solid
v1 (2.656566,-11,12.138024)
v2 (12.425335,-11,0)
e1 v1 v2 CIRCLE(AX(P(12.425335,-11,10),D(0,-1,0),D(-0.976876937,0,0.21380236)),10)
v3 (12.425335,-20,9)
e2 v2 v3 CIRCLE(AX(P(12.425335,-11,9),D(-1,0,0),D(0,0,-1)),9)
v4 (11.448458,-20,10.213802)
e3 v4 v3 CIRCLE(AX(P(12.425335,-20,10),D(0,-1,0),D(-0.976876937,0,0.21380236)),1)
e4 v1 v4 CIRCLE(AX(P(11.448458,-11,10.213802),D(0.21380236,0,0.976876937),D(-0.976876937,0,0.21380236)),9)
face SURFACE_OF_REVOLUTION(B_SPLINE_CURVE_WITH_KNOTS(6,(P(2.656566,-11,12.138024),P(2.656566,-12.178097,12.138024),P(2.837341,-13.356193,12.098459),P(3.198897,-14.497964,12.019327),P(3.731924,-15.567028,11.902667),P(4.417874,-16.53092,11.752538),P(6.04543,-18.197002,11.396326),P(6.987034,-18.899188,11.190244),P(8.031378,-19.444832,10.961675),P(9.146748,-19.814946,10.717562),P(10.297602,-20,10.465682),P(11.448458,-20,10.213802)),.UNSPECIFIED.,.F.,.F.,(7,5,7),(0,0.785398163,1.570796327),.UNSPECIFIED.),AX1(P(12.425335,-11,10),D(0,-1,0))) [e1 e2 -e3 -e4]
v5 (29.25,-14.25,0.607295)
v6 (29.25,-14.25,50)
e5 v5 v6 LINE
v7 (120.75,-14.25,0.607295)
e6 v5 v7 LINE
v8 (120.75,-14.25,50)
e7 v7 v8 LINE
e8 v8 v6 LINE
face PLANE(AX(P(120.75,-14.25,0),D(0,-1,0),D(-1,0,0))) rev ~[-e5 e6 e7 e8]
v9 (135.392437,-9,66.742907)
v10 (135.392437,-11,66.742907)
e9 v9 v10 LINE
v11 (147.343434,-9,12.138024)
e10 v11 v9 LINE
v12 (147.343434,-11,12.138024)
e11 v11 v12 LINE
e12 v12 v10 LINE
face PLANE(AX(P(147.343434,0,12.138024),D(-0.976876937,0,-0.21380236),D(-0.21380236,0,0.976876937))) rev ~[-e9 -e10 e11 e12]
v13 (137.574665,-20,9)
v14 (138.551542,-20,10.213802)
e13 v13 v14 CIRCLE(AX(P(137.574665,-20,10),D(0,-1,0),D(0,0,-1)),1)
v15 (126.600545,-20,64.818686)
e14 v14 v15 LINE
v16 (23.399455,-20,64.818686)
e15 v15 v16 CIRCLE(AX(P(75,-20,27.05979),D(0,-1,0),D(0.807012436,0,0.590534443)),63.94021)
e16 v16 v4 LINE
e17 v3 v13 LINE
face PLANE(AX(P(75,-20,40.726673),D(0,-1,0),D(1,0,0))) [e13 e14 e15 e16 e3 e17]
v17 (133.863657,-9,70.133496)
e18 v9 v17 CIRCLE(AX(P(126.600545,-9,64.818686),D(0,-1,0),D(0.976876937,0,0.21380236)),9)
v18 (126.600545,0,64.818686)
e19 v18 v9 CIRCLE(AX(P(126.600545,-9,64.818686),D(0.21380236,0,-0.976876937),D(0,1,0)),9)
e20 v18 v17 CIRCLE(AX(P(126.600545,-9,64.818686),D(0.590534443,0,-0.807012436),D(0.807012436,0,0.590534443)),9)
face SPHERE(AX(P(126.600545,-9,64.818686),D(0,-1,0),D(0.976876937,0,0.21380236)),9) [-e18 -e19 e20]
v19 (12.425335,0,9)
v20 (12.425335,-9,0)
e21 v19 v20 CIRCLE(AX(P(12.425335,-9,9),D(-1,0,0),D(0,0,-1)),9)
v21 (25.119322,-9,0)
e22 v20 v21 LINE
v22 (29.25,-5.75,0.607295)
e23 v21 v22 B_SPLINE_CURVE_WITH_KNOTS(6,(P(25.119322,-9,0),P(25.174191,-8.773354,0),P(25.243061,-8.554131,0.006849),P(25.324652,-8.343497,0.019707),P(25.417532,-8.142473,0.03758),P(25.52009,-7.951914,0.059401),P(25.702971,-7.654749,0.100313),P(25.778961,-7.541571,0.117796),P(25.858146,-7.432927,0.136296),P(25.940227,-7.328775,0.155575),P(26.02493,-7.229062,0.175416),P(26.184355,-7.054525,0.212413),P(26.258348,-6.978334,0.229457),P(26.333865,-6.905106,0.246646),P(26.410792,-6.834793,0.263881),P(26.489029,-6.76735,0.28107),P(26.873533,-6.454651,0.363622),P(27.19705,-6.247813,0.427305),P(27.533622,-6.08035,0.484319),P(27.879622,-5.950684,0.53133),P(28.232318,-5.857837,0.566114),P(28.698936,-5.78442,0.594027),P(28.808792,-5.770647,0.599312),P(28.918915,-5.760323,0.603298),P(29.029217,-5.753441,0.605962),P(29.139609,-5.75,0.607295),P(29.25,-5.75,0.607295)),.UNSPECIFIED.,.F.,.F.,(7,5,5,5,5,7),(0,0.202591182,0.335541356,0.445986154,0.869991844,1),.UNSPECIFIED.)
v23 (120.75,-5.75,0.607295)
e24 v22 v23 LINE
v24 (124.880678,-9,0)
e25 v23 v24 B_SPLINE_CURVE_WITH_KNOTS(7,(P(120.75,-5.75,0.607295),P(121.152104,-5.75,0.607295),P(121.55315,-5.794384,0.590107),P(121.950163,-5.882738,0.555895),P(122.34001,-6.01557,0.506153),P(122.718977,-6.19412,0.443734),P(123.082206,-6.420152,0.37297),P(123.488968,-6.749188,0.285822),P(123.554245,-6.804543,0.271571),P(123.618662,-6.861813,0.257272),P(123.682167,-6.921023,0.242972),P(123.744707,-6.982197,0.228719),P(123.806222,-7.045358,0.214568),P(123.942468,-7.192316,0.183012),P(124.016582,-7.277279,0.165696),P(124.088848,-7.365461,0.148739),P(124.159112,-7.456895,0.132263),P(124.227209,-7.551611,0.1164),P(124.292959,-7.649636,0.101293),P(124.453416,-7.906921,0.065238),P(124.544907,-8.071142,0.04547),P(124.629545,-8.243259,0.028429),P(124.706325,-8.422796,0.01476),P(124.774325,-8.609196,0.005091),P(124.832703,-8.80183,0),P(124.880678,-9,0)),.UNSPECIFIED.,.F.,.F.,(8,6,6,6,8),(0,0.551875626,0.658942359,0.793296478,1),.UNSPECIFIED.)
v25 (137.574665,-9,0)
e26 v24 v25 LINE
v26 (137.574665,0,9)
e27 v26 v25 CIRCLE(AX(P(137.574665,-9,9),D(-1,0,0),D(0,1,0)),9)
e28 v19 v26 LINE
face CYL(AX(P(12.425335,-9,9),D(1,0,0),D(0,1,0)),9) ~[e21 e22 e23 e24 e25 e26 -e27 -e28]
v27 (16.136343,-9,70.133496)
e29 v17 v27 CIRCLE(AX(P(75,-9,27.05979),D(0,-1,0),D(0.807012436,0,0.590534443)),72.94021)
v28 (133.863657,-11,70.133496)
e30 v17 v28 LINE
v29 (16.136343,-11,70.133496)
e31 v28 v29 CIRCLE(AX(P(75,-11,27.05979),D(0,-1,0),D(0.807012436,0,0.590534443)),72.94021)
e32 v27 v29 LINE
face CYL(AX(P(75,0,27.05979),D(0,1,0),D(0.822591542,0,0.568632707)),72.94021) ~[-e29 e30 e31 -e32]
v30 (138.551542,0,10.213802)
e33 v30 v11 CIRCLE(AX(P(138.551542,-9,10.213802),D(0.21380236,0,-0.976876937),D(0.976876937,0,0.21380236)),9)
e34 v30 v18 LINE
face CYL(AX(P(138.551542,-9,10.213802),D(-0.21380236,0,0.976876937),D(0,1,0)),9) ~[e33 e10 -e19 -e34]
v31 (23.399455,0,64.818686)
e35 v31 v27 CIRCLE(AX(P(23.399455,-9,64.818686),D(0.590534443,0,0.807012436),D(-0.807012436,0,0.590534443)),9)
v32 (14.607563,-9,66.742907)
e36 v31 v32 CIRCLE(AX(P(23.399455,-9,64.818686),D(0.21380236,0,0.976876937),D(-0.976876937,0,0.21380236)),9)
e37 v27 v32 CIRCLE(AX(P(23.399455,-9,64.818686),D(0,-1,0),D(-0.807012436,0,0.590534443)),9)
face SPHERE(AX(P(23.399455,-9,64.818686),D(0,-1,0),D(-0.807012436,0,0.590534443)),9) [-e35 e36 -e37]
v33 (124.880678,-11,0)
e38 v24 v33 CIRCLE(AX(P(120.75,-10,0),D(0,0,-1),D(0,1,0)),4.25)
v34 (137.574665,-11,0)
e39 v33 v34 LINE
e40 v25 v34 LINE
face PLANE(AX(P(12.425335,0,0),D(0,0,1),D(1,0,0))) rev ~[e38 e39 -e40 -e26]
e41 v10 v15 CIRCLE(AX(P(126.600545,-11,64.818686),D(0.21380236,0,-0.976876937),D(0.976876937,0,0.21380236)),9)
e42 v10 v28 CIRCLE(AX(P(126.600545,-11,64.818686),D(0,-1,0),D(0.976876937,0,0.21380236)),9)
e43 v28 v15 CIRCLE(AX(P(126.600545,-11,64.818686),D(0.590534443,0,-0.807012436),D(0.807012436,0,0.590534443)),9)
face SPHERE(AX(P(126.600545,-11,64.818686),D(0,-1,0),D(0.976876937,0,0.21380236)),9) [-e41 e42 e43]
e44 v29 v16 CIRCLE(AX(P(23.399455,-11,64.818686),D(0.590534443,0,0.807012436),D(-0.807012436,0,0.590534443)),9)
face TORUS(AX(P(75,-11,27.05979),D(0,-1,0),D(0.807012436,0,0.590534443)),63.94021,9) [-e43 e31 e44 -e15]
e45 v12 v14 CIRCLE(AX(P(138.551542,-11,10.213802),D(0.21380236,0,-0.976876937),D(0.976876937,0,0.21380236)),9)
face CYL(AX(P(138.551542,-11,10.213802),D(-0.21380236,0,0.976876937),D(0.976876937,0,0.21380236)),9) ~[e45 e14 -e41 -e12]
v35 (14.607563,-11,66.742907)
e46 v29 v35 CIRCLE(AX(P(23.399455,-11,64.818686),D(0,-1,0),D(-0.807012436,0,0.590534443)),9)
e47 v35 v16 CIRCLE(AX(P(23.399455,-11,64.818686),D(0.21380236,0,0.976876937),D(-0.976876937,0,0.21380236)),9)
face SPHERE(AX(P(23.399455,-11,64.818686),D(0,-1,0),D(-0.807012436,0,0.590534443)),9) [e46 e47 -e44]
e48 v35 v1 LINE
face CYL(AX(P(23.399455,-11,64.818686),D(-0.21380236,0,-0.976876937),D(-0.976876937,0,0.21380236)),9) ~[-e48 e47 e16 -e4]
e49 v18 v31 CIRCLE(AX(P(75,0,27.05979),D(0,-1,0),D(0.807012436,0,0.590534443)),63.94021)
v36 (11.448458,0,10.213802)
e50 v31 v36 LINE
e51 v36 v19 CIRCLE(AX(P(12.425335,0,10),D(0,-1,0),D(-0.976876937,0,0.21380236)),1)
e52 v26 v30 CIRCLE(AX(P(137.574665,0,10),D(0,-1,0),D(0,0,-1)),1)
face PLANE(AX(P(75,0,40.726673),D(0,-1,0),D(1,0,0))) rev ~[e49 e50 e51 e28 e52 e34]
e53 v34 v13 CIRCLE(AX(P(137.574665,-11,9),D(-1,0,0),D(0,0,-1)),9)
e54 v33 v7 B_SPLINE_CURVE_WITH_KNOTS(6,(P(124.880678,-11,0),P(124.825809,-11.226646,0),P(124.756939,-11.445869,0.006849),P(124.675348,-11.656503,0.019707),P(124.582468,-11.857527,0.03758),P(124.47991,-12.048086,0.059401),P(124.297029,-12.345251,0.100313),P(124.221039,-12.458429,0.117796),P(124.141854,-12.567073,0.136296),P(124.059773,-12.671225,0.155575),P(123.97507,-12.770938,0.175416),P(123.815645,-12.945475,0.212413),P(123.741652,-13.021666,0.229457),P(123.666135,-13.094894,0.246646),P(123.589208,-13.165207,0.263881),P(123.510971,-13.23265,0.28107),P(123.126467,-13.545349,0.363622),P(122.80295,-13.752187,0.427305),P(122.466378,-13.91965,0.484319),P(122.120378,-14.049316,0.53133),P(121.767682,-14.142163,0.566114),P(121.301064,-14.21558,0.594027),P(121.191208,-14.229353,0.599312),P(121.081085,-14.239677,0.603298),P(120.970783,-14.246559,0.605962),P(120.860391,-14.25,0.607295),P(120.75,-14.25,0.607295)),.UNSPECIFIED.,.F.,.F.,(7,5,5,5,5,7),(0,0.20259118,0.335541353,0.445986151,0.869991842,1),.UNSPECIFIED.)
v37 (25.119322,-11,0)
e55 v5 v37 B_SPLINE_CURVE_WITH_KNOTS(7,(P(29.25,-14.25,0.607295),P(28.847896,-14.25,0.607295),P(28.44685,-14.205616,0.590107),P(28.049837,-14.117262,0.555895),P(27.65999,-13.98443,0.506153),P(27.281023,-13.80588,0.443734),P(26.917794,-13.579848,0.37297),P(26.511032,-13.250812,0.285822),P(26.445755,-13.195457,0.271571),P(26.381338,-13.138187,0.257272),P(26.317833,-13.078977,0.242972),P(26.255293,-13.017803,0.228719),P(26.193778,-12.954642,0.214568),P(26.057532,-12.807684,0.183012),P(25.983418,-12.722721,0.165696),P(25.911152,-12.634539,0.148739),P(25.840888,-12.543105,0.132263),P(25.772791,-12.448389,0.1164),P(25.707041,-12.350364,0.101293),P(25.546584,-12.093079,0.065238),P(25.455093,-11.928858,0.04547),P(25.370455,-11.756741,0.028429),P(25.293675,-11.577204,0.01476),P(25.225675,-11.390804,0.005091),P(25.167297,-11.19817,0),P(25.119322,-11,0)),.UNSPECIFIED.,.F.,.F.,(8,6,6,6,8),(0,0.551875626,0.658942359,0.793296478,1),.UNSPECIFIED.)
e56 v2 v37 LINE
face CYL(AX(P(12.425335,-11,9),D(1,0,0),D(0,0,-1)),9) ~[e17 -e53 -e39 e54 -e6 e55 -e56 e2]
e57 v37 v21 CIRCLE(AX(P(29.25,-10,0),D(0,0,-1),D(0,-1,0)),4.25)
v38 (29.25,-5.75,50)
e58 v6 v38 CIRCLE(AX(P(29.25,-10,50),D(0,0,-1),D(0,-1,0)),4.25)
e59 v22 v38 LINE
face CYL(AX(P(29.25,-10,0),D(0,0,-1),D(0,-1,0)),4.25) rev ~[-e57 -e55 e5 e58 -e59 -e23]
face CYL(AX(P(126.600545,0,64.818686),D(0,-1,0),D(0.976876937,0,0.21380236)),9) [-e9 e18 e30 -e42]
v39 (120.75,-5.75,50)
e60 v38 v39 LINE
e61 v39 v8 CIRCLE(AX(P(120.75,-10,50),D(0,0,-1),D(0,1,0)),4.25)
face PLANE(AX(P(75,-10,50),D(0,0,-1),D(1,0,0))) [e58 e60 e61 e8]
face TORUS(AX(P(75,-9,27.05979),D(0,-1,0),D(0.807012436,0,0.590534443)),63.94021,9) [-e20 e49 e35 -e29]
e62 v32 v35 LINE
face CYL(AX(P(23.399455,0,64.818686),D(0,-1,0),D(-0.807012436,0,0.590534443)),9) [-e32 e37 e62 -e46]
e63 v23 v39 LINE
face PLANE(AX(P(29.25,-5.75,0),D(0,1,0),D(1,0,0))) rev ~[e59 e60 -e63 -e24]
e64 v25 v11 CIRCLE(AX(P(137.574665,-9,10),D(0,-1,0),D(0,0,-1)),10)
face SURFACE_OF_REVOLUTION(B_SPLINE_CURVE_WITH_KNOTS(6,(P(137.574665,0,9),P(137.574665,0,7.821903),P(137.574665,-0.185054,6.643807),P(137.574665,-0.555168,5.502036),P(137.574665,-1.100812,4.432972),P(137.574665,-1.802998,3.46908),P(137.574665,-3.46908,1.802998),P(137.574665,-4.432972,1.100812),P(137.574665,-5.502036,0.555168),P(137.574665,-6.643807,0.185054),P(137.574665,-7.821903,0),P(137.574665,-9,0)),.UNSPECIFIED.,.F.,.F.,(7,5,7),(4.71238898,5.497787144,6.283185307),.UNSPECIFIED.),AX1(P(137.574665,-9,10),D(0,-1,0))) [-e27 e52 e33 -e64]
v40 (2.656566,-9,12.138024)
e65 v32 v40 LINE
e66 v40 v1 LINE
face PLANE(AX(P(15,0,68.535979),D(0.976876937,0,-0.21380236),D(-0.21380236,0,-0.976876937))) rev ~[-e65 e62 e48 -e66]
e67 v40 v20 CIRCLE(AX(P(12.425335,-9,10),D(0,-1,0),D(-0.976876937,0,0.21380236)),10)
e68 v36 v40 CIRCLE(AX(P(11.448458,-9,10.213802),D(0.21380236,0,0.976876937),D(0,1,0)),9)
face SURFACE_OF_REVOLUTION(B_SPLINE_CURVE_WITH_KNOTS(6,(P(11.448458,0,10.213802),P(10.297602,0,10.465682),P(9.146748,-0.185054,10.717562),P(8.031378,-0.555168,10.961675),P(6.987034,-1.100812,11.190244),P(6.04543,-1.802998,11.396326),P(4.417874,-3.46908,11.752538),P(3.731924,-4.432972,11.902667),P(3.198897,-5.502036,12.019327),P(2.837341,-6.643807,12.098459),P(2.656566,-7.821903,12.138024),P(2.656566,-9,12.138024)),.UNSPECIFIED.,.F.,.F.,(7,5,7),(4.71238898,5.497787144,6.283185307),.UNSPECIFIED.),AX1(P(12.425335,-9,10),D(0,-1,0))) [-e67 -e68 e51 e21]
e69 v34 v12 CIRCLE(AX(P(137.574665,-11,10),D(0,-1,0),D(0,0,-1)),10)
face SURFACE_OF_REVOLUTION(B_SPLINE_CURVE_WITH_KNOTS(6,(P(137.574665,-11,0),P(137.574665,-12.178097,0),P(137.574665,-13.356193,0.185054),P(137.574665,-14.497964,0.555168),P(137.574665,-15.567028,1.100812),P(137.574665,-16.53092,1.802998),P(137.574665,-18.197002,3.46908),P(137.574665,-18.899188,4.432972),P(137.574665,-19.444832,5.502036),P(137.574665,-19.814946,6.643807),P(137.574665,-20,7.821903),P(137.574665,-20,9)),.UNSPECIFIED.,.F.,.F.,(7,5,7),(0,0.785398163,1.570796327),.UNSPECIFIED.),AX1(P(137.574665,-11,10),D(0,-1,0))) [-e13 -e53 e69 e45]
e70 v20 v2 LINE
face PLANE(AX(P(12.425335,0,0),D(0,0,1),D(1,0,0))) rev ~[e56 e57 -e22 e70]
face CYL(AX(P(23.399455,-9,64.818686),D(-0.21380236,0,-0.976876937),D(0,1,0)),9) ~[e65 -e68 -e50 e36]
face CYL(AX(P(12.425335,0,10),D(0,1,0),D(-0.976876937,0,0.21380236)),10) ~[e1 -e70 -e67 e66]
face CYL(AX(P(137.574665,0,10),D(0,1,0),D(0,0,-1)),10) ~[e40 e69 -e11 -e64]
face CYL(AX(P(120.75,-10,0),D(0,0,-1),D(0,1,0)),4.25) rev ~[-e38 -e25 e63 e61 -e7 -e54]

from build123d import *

# Parameters (mm, degrees)
F1_DEPTH = 20
F2_F1_R  = 9
F2_F2_R  = 9
F2_F3_R  = 9
F2_F4_R  = 9
F4_DEPTH = 50


# Not quite as in the source:
# - a feature names something its author has since deleted; it is built from what else it names


with BuildPart() as f1:
    # F0 (on Front) → F1 (new body)
    with BuildSketch(Plane.XZ):
        with BuildLine():
            ThreePointArc((2.6565660371, 12.138023602), (4.6349491554, 3.7302406753), (12.4253354109, 0))
            Line((12.4253354109, 0), (137.5746645891, 0))
            ThreePointArc((137.5746645891, 0), (145.3650508446, 3.7302406753), (147.3434339629, 12.138023602))
            Line((147.3434339629, 12.138023602), (135, 68.5359789614))
            ThreePointArc((135, 68.5359789614), (75, 100), (15, 68.5359789614))
            Line((15, 68.5359789614), (2.6565660371, 12.138023602))
        make_face()
    extrude(amount=F1_DEPTH)

    # F2: fillet of radius 9 on 13 edges, made by hand

    # F2_f1
    f2_f1_edges = [f1.edges().sort_by_distance(p)[0] for p in [
        (135, -10, 68.5359789614),
    ]]
    fillet(f2_f1_edges, radius=F2_F1_R)

    # F2_f2
    f2_f2_edges = [f1.edges().sort_by_distance(p)[0] for p in [
        (15, -10, 68.5359789614),
    ]]
    fillet(f2_f2_edges, radius=F2_F2_R)

    # F2_f3
    f2_f3_edges = [f1.edges().sort_by_distance(p)[0] for p in [
        (75, 0, 100),
    ]]
    fillet(f2_f3_edges, radius=F2_F3_R)

    # F2_f4
    f2_f4_edges = [f1.edges().sort_by_distance(p)[0] for p in [
        (75, -20, 100),
    ]]
    fillet(f2_f4_edges, radius=F2_F4_R)

    # F3 (on face) → F4 (cut)
    with BuildSketch(Plane(origin=(0, 0, 0), x_dir=(1, 0, 0), z_dir=(0, 0, -1))):
        with BuildLine():
            Line((29.25, 5.75), (120.75, 5.75))
            ThreePointArc((120.75, 5.75), (125, 10), (120.75, 14.25))
            Line((120.75, 14.25), (29.25, 14.25))
            ThreePointArc((29.25, 14.25), (25, 10), (29.25, 5.75))
        make_face()
    extrude(amount=-F4_DEPTH, mode=Mode.SUBTRACT)


solid = f1.part
